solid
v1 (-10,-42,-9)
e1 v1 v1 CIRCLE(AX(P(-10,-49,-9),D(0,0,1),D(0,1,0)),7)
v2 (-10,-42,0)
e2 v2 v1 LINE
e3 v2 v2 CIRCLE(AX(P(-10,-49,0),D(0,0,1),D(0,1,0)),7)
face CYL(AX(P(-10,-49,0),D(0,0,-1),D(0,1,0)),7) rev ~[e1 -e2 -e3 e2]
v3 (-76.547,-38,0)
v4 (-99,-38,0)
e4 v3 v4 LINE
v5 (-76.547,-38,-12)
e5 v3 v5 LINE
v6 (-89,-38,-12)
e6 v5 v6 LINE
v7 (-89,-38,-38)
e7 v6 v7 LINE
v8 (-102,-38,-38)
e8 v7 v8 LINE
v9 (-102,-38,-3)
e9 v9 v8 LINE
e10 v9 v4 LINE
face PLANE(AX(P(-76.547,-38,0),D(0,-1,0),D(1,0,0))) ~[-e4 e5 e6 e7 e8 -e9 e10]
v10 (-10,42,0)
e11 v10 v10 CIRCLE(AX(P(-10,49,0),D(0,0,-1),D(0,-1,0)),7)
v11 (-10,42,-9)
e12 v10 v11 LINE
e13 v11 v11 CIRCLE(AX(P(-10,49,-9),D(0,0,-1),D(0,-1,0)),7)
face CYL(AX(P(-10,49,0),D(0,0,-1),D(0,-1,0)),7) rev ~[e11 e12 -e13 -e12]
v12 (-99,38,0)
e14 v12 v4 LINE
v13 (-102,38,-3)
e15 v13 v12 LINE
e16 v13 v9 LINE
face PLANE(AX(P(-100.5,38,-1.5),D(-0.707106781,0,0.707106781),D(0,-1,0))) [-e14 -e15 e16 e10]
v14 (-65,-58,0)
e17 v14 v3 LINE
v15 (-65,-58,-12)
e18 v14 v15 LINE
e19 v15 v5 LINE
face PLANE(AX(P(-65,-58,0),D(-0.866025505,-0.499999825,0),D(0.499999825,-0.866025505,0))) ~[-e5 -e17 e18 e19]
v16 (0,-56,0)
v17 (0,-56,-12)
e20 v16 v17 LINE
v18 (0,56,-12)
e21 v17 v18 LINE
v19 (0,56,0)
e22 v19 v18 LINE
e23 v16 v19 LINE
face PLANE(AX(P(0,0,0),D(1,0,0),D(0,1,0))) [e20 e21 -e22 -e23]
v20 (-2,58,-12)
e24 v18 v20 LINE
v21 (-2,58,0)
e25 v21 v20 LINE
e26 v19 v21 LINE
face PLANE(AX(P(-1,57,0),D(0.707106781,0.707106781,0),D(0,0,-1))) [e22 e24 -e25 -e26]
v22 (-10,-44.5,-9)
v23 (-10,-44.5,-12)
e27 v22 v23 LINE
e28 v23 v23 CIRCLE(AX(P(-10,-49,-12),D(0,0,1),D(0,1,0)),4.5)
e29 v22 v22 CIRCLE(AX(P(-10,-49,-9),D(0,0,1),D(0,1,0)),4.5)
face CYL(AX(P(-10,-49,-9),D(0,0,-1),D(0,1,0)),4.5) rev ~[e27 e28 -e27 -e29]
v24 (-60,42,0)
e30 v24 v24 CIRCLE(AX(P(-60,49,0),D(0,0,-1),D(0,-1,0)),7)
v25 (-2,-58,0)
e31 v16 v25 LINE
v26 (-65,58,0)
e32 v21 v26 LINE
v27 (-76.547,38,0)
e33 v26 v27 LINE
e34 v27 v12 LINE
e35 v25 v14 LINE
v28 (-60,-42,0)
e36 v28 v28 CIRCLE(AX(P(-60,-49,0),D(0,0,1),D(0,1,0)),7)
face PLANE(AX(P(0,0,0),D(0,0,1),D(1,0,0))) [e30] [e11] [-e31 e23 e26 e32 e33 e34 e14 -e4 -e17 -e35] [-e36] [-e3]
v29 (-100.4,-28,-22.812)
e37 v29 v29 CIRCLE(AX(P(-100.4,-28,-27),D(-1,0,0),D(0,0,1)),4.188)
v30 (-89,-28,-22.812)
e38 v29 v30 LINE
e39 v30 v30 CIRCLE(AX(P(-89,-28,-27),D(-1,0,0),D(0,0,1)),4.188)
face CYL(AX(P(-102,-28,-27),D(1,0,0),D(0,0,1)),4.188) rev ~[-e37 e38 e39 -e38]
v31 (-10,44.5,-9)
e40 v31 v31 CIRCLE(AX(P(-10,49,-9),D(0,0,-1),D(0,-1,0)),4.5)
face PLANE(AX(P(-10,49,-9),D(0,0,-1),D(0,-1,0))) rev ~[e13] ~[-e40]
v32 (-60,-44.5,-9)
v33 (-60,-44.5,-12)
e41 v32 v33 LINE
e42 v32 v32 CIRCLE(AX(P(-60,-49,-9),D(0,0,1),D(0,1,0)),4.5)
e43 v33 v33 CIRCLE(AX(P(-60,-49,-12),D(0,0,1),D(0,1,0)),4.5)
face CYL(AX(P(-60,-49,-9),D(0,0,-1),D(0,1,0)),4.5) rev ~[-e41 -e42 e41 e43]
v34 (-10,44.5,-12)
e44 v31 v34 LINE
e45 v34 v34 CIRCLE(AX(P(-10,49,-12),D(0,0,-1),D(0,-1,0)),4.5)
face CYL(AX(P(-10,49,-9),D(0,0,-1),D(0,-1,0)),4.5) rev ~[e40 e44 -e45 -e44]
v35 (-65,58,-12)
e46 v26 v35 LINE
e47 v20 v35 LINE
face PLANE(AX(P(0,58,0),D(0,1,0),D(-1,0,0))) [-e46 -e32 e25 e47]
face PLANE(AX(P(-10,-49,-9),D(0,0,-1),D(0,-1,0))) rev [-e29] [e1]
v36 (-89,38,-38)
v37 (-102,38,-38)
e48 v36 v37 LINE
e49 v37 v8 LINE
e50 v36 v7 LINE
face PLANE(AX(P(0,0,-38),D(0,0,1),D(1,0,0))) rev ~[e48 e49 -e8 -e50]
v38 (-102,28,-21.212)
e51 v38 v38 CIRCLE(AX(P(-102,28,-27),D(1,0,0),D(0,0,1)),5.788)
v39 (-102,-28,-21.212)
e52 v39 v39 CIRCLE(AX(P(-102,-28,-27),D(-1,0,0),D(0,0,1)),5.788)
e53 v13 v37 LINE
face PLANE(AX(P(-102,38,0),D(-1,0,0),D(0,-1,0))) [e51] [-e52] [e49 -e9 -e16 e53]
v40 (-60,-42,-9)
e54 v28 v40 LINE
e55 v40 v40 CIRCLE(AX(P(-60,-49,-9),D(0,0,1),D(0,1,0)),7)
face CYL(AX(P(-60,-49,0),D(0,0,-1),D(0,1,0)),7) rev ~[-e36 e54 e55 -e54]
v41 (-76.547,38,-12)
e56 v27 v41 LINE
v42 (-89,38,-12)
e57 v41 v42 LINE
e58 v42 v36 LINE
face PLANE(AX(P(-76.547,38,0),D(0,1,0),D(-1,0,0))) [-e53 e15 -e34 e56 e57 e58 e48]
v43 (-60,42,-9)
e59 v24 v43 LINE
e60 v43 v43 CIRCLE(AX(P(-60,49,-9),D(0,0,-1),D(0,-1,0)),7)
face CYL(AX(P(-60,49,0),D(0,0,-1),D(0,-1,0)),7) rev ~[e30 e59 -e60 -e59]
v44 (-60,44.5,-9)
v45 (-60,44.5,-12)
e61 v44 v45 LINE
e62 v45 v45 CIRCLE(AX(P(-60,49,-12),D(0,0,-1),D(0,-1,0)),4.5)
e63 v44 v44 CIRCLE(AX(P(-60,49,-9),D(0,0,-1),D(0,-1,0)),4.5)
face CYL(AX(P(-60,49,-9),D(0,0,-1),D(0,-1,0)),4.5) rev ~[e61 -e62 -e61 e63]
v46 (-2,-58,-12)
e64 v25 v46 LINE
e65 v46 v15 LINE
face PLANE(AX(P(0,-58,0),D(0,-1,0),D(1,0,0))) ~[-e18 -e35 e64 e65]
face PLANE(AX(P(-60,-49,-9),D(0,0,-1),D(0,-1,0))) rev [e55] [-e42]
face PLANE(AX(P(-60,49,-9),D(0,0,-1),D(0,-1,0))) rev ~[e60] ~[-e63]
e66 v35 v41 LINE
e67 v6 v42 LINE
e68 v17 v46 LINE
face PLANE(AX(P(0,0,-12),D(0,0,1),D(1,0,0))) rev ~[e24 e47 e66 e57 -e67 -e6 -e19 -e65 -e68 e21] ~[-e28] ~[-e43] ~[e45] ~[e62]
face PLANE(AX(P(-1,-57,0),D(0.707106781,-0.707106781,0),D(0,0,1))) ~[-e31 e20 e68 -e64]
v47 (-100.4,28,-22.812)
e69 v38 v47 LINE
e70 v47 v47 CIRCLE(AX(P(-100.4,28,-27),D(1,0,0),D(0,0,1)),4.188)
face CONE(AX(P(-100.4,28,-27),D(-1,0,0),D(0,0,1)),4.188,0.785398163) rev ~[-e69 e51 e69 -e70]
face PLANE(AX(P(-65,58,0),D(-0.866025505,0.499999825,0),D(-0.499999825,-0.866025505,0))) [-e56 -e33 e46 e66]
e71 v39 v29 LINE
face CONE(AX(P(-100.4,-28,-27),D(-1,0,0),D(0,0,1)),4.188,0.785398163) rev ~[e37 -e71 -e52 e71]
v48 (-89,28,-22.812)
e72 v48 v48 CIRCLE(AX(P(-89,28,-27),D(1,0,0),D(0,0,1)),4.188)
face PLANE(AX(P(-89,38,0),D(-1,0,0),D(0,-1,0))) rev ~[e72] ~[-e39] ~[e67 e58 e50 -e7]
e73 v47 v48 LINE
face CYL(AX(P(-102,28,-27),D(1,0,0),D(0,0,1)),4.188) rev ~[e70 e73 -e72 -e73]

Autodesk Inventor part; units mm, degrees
ref_plane "YZ Plane" through (0, 0, 0) normal (1, 0, 0) x (0, 1, 0)
ref_plane "XZ Plane" through (0, 0, 0) normal (0, 1, 0) x (-1, 0, 0)
ref_plane "XY Plane" through (0, 0, 0) normal (0, 0, 1) x (1, 0, 0)
sketch "Эскиз1" plane through (0, 0, 0) normal (0, 0, 1) x (1, 0, 0)
  line L0 (0, 0) -> (0, 58)
  line L1 (0, 58) -> (-65, 58)
  line L2 (-65, 58) -> (-76.547, 38)
  line L3 (-76.547, 38) -> (-102, 38)
  line L4 (-102, 38) -> (-102, 0)
  line L5 (-102, 0) -> (0, 0)
  line L6 (-89, 38) -> (-89, 0)
  point P0 (-60, 49)
  point P1 (-10, 49)
  dimension "d0" = 116
  dimension "d1" = 76
  dimension "d2" = 60
  dimension "d3" = 65
  dimension "d4" = 102
  dimension "d5" = 13
  dimension "d6" = 50
  dimension "d7" = 10
  dimension "d8" = 98
extrude "Выдавливание1" add sketch "Эскиз1" against normal blind 12 contours L5 L6 L3 L2 L1 L0
extrude "Выдавливание2" add sketch "Эскиз1" against normal blind 38 contours L5 L4 L3 L6
hole "Отверстие1" at (-60, 49, 0) at (-10, 49, 0) direction (0, 0, -1) diameter 9 end through all counterbore diameter 14 counterbore depth 9
hole "Отверстие2" at (-102, 28, -27) direction (1, 0, 0) diameter 8.376 end through all thread size "M10x1.5" class "6H" standard "ISO Metric profile"
chamfer "Фаска1" distance 1.6 angle 45 1 edges at (-102, 28, -31.188)
chamfer "Фаска2" distance 3 angle 45 1 edges at (-102, 19, 0)
chamfer "Фаска3" distance 2 angle 45 1 edges at (0, 58, -6)
mirror "Зеркальное отражение1" about plane through (0, 0, 0) normal (0, -1, 0)
properties part number "Крышка 6"
